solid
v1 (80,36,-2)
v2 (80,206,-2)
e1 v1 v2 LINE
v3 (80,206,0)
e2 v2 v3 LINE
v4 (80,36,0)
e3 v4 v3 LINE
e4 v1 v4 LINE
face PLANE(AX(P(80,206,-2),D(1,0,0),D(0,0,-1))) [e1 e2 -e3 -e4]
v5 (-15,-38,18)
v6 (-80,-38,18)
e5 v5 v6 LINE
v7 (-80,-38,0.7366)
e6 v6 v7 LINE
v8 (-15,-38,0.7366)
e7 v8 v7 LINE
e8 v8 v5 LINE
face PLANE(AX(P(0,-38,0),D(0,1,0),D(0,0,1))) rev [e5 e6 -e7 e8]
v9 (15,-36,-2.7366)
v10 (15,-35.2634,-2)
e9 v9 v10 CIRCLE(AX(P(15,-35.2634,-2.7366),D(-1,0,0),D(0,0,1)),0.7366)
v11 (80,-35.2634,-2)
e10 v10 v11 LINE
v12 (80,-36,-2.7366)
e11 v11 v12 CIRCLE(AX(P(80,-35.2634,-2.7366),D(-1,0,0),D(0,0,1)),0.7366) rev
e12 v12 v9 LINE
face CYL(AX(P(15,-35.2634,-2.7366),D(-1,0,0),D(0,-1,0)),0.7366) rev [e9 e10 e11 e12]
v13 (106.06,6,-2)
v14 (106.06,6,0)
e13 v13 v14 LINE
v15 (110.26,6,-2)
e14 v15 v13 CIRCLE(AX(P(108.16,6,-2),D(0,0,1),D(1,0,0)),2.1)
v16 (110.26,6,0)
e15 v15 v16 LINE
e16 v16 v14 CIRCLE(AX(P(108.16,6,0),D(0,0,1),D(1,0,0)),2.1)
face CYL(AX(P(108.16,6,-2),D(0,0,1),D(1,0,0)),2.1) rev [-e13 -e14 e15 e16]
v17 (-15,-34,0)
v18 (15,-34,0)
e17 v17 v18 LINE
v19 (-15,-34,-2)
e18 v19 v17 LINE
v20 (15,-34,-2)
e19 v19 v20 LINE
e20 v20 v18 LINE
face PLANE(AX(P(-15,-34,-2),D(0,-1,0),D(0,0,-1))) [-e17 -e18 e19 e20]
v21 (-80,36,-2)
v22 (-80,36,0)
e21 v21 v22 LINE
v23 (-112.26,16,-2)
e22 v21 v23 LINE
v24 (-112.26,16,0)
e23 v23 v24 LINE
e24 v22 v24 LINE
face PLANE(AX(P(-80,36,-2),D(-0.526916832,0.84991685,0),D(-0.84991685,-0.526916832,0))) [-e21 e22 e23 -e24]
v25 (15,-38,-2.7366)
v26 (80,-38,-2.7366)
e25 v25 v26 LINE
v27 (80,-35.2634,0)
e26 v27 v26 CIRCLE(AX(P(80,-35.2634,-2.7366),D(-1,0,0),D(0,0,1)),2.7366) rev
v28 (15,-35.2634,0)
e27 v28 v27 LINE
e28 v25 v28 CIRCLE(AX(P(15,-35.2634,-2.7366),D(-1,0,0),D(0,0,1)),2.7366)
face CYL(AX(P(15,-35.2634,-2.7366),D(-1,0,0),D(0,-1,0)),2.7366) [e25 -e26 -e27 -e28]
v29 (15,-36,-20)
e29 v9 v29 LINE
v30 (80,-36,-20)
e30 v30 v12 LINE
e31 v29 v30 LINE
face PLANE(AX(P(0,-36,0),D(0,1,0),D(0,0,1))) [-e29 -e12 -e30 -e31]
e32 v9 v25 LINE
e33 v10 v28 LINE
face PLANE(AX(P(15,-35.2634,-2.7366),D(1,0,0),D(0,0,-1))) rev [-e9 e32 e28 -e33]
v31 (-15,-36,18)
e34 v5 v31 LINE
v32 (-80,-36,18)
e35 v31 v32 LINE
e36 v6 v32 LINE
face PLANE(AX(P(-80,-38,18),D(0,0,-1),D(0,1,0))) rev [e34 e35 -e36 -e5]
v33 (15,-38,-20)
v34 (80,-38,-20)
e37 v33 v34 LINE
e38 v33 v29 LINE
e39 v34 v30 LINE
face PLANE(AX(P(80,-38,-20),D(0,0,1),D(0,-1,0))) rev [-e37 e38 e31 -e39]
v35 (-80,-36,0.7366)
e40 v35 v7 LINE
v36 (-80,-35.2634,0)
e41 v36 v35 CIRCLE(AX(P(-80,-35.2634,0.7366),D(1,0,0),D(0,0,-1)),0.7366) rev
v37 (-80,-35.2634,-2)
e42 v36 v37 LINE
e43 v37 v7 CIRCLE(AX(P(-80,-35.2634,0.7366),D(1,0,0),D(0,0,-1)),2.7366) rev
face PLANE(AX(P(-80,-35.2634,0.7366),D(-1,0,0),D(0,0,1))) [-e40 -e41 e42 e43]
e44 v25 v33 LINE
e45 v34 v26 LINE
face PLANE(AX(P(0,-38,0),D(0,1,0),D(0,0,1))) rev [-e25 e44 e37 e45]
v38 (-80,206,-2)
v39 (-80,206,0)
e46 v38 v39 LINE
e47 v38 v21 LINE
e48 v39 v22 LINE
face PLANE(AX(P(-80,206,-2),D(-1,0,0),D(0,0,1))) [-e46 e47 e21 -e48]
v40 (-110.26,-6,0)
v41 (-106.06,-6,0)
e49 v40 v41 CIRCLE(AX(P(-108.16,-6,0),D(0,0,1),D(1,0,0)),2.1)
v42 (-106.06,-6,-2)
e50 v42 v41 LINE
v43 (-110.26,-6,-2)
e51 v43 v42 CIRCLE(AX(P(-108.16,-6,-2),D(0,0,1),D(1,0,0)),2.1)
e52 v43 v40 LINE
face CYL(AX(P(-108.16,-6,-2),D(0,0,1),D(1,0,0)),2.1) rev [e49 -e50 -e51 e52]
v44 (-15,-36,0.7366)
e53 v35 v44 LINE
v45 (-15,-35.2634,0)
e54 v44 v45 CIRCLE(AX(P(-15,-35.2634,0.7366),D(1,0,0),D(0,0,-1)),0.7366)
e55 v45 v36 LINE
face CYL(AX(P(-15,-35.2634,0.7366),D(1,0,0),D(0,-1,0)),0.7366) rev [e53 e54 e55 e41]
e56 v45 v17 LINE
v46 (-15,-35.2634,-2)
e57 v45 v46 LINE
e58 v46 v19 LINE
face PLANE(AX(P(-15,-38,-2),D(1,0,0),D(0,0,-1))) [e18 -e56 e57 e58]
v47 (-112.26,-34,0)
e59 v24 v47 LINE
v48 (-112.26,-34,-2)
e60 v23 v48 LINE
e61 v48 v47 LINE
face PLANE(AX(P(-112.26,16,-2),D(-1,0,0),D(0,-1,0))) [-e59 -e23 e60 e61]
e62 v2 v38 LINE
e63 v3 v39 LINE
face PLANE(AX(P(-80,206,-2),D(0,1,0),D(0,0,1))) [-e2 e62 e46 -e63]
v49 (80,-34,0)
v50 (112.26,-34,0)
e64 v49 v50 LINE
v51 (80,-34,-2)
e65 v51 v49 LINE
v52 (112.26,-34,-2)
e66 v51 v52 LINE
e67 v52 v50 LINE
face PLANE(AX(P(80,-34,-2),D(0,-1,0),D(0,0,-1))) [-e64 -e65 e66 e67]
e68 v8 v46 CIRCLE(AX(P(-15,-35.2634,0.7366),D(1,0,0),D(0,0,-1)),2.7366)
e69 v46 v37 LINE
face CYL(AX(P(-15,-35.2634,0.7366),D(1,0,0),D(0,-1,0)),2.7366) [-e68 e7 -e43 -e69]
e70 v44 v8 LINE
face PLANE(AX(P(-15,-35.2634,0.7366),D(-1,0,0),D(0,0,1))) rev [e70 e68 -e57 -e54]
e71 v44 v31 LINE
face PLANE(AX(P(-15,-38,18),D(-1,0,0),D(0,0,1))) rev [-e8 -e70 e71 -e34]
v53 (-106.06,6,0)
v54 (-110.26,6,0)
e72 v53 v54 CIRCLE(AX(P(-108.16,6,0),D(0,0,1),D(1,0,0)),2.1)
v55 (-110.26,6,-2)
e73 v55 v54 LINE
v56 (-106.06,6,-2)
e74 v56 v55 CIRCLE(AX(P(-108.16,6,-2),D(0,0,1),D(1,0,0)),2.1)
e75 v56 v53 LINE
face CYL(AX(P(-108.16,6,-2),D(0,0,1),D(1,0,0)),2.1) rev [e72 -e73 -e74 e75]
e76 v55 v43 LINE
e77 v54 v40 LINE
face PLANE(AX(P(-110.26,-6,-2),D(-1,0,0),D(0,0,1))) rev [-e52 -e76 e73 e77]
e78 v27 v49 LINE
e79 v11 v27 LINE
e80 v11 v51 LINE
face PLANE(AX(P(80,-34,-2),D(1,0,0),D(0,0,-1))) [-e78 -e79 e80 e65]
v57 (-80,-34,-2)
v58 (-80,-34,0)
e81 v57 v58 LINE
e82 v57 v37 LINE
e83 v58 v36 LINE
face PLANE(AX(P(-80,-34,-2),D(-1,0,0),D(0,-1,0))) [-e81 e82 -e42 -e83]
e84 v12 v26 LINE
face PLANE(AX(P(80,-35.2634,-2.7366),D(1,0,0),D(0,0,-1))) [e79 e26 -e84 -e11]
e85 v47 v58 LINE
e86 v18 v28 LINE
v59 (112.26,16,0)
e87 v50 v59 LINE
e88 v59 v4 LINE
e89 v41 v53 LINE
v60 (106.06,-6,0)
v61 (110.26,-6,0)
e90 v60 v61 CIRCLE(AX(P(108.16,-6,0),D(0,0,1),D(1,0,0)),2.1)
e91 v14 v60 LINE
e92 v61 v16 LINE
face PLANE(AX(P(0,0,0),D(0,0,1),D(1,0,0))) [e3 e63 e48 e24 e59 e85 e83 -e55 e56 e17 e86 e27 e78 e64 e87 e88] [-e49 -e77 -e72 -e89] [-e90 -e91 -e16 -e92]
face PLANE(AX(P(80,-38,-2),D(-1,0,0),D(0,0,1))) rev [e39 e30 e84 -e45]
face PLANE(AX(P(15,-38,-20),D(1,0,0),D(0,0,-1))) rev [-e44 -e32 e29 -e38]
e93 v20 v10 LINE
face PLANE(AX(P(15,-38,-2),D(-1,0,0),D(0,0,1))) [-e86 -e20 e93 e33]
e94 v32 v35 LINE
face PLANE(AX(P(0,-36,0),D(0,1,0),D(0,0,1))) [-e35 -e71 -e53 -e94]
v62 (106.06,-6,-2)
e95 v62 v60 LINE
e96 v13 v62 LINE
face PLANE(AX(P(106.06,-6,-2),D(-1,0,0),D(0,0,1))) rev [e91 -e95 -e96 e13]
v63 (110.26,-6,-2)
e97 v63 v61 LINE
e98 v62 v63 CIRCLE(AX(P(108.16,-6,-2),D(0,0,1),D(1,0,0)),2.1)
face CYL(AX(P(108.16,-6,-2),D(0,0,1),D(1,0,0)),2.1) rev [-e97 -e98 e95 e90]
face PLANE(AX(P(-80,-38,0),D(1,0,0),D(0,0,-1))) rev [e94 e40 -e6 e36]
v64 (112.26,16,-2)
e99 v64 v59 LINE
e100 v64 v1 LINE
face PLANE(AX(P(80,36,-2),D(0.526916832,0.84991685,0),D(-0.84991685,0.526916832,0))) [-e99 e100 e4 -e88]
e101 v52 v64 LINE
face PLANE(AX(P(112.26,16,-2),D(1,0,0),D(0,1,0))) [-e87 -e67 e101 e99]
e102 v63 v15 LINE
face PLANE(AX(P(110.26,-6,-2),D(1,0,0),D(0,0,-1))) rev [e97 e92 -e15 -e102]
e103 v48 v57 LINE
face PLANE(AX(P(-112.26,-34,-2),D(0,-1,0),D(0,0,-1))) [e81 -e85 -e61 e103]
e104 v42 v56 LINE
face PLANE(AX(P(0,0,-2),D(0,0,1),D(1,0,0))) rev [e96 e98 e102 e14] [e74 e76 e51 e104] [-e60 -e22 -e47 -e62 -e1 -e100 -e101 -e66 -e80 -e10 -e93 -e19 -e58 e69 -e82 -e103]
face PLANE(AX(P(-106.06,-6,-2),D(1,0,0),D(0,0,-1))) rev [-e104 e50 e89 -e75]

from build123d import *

# Parameters (mm, degrees)
BASE_FLANGE1_DEPTH           = 2
EDGE_FLANGE1_STRIP_W         = 9.4732
EDGE_FLANGE1_STRIP_H         = 2
EDGE_FLANGE1_STRIP_CUT_DEPTH = 65
EDGE_FLANGE1_DEPTH           = 65
EDGE_FLANGE2_STRIP_W         = 9.4732
EDGE_FLANGE2_STRIP_H         = 2
EDGE_FLANGE2_STRIP_CUT_DEPTH = 65
EDGE_FLANGE2_DEPTH           = 65


# Sheet-metal steps are written as plain solids
with BuildPart() as part:
    # Sketch1 → Base-Flange1 (new body)
    with BuildSketch(Plane.XY):
        Polygon((-80, 206), (-80, 36), (-112.26, 16), (-112.26, -34), (-80, -34), (-80, -38), (-15, -38), (-15, -34), (15, -34), (15, -38), (80, -38), (80, -34), (112.26, -34), (112.26, 16), (80, 36), (80, 206), align=None)
        with BuildLine():
            Line((-110.26, -6), (-110.26, 6))
            ThreePointArc((-110.26, 6), (-108.16, 8.1), (-106.06, 6))
            Line((-106.06, 6), (-106.06, -6))
            ThreePointArc((-106.06, -6), (-108.16, -8.1), (-110.26, -6))
        make_face(mode=Mode.SUBTRACT)
        with BuildLine():
            Line((106.06, -6), (106.06, 6))
            ThreePointArc((106.06, 6), (108.16, 8.1), (110.26, 6))
            Line((110.26, 6), (110.26, -6))
            ThreePointArc((110.26, -6), (108.16, -8.1), (106.06, -6))
        make_face(mode=Mode.SUBTRACT)
    extrude(amount=-BASE_FLANGE1_DEPTH)

    # Edge-Flange1 strip (across the edge) → Edge-Flange1 strip cut (cut)
    with BuildSketch(Plane(origin=(-80, -38, 0), x_dir=(0, 1, 0), z_dir=(1, 0, 0))):
        with Locations((-2, -1)):
            Rectangle(EDGE_FLANGE1_STRIP_W, EDGE_FLANGE1_STRIP_H)
    extrude(amount=EDGE_FLANGE1_STRIP_CUT_DEPTH, mode=Mode.SUBTRACT)

    # Edge-Flange1 section (across the edge) → Edge-Flange1 (add)
    with BuildSketch(Plane(origin=(-80, -38, 0), x_dir=(0, 1, 0), z_dir=(1, 0, 0))):
        with BuildLine():
            Line((0, 0.7366), (0, 18))
            Line((0, 18), (2, 18))
            Line((2, 18), (2, 0.7366))
            ThreePointArc((2, 0.7366), (2.215745145, 0.215745145), (2.7366, 0))
            Line((2.7366, 0), (2.7366, -2))
            ThreePointArc((2.7366, -2), (0.801531583, -1.198468417), (0, 0.7366))
        make_face()
    extrude(amount=EDGE_FLANGE1_DEPTH)

    # Edge-Flange2 strip (across the edge) → Edge-Flange2 strip cut (cut)
    with BuildSketch(Plane(origin=(80, -38, -2), x_dir=(0, 1, 0), z_dir=(-1, 0, 0))):
        with Locations((-2, -1)):
            Rectangle(EDGE_FLANGE2_STRIP_W, EDGE_FLANGE2_STRIP_H)
    extrude(amount=EDGE_FLANGE2_STRIP_CUT_DEPTH, mode=Mode.SUBTRACT)

    # Edge-Flange2 section (across the edge) → Edge-Flange2 (add)
    with BuildSketch(Plane(origin=(80, -38, -2), x_dir=(0, 1, 0), z_dir=(-1, 0, 0))):
        with BuildLine():
            Line((0, 0.7366), (0, 18))
            Line((0, 18), (2, 18))
            Line((2, 18), (2, 0.7366))
            ThreePointArc((2, 0.7366), (2.215745145, 0.215745145), (2.7366, 0))
            Line((2.7366, 0), (2.7366, -2))
            ThreePointArc((2.7366, -2), (0.801531583, -1.198468417), (0, 0.7366))
        make_face()
    extrude(amount=EDGE_FLANGE2_DEPTH)


solid = part.part
